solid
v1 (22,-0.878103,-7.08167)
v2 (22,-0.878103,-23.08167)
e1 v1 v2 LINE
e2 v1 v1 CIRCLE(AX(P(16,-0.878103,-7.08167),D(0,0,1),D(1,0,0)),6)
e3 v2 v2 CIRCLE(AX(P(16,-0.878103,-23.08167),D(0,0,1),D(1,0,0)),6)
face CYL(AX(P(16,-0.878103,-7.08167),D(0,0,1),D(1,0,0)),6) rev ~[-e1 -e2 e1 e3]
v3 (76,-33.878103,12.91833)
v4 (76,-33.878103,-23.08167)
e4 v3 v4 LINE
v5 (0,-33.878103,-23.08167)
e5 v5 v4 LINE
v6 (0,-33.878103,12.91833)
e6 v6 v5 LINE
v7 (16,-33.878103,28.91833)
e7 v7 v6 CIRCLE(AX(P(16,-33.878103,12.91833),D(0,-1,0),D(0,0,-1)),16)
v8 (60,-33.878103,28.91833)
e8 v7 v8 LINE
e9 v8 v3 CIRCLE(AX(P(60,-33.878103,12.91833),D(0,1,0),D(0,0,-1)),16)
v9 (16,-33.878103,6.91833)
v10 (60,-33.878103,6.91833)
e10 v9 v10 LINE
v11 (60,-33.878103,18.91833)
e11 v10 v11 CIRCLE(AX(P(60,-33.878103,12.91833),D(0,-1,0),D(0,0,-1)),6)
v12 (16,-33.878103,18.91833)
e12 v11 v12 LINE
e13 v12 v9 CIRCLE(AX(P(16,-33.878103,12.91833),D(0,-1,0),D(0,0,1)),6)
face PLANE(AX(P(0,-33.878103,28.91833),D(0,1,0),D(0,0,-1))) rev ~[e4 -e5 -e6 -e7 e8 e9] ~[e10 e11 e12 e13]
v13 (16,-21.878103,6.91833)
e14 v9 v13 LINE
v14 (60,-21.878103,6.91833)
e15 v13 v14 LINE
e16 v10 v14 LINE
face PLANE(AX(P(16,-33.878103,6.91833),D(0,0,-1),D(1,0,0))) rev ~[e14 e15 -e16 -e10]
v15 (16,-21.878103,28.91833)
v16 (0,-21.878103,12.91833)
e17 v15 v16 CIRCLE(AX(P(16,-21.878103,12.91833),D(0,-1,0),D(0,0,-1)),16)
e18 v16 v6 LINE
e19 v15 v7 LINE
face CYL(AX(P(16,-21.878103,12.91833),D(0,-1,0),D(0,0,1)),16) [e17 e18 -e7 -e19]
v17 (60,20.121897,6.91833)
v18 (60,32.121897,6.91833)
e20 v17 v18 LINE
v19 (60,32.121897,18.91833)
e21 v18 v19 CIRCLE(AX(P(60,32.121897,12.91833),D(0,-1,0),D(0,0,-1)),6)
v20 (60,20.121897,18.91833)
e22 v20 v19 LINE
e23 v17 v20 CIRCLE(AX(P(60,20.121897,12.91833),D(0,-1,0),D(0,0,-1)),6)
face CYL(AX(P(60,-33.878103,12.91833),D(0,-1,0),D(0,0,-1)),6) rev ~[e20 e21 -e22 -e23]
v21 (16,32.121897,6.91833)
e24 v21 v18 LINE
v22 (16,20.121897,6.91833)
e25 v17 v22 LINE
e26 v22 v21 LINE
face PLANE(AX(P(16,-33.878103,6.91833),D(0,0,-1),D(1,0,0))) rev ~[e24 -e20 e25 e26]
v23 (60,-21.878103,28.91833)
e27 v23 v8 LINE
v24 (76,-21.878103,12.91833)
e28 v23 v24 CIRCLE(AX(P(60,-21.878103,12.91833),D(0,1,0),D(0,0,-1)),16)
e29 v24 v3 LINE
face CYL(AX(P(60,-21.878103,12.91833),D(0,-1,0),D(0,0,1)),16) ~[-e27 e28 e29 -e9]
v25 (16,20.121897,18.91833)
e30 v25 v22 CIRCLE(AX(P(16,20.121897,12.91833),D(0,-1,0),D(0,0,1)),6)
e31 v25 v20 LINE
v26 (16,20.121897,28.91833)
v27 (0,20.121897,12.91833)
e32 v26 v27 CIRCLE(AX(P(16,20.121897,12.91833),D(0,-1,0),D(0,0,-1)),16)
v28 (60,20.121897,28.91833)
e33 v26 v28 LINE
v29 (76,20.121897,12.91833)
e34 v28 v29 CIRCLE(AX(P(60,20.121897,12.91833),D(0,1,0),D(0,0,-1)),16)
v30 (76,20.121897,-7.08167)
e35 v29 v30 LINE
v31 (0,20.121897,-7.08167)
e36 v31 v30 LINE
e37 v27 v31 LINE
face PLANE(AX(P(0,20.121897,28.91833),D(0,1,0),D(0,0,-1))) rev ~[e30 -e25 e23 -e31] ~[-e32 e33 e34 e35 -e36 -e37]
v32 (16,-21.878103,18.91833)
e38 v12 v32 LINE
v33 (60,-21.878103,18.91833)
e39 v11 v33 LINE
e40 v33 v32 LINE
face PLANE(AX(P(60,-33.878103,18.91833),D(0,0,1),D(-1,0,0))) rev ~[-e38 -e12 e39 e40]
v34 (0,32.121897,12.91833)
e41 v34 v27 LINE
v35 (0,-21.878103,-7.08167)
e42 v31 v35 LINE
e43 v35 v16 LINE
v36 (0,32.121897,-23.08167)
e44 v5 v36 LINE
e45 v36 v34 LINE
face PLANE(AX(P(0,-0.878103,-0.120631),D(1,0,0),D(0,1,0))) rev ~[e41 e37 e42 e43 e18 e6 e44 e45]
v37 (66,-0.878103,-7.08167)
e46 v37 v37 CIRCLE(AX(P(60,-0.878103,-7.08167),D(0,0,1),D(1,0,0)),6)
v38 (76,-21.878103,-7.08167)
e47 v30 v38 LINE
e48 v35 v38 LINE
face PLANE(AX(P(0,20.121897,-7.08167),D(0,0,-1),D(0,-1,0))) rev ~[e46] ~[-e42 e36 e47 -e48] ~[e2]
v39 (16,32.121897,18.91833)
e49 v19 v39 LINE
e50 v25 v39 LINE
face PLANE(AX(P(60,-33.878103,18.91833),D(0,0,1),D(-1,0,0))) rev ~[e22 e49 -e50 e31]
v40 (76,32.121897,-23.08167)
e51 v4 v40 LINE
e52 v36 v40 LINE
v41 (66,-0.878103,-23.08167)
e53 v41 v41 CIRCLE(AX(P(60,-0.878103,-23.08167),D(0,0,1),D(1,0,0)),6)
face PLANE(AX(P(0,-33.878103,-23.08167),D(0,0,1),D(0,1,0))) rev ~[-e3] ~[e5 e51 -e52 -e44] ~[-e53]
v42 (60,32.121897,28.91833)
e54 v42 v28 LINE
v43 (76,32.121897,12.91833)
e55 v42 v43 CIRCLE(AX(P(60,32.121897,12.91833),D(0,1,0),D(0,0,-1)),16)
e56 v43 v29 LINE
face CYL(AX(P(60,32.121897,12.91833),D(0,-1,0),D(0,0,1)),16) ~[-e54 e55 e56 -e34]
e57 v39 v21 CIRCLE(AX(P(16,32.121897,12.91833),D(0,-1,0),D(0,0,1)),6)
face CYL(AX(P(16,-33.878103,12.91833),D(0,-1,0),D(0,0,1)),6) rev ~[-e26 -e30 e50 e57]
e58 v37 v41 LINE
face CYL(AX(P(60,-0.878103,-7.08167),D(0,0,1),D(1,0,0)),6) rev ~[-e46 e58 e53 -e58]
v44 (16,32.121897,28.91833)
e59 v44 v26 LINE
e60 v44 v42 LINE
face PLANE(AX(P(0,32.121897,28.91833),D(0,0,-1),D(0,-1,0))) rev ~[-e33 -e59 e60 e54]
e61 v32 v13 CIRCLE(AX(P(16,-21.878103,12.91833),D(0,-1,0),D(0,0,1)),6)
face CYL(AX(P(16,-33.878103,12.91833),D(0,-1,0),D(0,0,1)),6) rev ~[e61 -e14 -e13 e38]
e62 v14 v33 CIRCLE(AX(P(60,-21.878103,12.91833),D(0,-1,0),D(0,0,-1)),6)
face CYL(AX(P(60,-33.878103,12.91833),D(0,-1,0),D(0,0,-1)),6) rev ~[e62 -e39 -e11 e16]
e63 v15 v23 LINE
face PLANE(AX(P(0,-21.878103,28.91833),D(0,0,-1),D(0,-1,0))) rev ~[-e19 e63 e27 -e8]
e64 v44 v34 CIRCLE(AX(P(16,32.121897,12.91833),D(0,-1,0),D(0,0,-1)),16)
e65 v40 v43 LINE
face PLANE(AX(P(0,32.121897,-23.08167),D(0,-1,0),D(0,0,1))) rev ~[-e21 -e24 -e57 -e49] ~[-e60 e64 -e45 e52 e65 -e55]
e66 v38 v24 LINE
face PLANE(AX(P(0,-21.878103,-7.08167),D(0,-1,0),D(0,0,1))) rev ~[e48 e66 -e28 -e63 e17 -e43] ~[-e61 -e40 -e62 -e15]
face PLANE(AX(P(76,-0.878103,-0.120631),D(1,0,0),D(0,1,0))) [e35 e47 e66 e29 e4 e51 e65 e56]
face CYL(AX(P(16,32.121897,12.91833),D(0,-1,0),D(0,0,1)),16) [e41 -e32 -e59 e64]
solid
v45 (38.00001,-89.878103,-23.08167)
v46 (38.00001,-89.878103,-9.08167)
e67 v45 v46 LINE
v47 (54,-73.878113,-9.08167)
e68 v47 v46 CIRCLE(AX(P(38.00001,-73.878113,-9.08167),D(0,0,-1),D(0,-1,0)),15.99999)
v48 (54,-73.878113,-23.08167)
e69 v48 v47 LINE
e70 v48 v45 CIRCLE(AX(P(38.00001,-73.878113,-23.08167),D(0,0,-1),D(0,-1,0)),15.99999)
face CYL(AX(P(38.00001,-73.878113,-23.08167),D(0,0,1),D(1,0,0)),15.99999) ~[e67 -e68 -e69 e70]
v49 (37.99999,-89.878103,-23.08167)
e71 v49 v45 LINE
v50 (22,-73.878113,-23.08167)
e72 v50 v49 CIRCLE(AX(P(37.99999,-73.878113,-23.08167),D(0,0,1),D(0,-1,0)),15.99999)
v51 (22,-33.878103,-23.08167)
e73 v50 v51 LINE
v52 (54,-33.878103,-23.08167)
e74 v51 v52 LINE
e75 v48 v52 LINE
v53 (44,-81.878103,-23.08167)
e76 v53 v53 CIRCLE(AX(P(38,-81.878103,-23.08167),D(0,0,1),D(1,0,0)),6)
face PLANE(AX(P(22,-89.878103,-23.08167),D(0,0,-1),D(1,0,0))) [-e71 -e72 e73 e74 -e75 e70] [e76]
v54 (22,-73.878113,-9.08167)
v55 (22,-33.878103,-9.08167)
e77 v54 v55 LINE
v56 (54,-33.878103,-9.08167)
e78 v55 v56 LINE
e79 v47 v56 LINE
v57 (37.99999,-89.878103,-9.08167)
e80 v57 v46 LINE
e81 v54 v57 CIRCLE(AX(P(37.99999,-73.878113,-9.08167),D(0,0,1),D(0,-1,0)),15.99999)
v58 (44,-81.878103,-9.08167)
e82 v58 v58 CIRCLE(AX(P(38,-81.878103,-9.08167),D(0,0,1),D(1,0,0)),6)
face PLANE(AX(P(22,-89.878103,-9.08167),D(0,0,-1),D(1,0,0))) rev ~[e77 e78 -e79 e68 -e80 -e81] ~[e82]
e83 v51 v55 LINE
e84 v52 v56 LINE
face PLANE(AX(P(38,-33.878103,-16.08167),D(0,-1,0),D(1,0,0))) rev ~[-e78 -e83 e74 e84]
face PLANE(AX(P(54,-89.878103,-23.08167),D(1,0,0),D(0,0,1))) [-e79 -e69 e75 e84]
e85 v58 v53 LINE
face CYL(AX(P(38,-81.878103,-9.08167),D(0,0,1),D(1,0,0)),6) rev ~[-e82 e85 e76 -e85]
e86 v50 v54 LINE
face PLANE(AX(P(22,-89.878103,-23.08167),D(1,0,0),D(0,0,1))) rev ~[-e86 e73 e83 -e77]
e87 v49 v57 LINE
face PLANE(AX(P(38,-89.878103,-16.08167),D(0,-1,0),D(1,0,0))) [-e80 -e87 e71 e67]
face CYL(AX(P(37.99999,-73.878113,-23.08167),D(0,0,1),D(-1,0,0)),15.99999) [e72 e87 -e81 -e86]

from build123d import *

# Parameters (mm, degrees)
F1_DEPTH  = 76
F2_R      = 16
F4_DEPTH  = 66.001
F5_R      = 6
F6_DEPTH  = 16.001
F8_W      = 32
F8_H      = 14
F9_DEPTH  = 56
F11_R     = 15.99999
F10_R     = 6
F12_DEPTH = 14.001


# Not quite as in the source:
# - a fillet or chamfer is up to 0.001 mm smaller than in the source, because OpenCascade refuses the exact size


with BuildPart() as f1:
    # F0 (on Right) → F1 (new body)
    with BuildSketch(Plane.YZ):
        Polygon((-33.8781030774, 28.9183304161), (-33.8781030774, -23.0816695839), (32.1218969226, -23.0816695839), (32.1218969226, 28.9183304161), (20.1218969226, 28.9183304161), (20.1218969226, -7.0816695839), (-21.8781030774, -7.0816695839), (-21.8781030774, 28.9183304161), align=None)
    extrude(amount=F1_DEPTH)

    # F2
    f2_edges = [f1.edges().sort_by_distance(p)[0] for p in [
        (76, -27.878103, 28.91833),
        (76, 26.121897, 28.91833),
        (0, 26.121897, 28.91833),
        (0, -27.878103, 28.91833),
    ]]
    fillet(f2_edges, radius=F2_R)

    # F3 (on face) → F4 (cut, through all)
    with BuildSketch(Plane.XZ.offset(33.8781030774)):
        with BuildLine():
            Line((60, 18.9183304161), (16, 18.9183304161))
            ThreePointArc((16, 18.9183304161), (10, 12.9183304161), (16, 6.9183304161))
            Line((16, 6.9183304161), (60, 6.9183304161))
            ThreePointArc((60, 6.9183304161), (66, 12.9183304161), (60, 18.9183304161))
        make_face()
    extrude(amount=-F4_DEPTH, mode=Mode.SUBTRACT)

    # F5 (on face) → F6 (cut, through all)
    with BuildSketch(Plane.XY.offset(-7.0816695839)):
        with Locations((60, -0.8781030774)):
            Circle(F5_R)
        with Locations((16, -0.8781030774)):
            Circle(F5_R)
    extrude(amount=-F6_DEPTH, mode=Mode.SUBTRACT)


with BuildPart() as f9:
    # F8 (on offset) → F9 (new body)
    with BuildSketch(Plane.XZ.offset(89.8781030774)):
        with Locations((38, -16.0816695839)):
            Rectangle(F8_W, F8_H)
    extrude(amount=-F9_DEPTH)

    # F11 (radius 16 in the source; OpenCascade refuses exactly that, so slightly less here)
    f11_edges = [f9.edges().sort_by_distance(p)[0] for p in [
        (54, -89.878103, -16.08167),
        (22, -89.878103, -16.08167),
    ]]
    fillet(f11_edges, radius=F11_R)

    # F10 (on face) → F12 (cut, through all)
    with BuildSketch(Plane.XY.offset(-9.0816695839)):
        with Locations((38, -81.8781030774)):
            Circle(F10_R)
    extrude(amount=-F12_DEPTH, mode=Mode.SUBTRACT)


solid = Compound([f1.part, f9.part])
